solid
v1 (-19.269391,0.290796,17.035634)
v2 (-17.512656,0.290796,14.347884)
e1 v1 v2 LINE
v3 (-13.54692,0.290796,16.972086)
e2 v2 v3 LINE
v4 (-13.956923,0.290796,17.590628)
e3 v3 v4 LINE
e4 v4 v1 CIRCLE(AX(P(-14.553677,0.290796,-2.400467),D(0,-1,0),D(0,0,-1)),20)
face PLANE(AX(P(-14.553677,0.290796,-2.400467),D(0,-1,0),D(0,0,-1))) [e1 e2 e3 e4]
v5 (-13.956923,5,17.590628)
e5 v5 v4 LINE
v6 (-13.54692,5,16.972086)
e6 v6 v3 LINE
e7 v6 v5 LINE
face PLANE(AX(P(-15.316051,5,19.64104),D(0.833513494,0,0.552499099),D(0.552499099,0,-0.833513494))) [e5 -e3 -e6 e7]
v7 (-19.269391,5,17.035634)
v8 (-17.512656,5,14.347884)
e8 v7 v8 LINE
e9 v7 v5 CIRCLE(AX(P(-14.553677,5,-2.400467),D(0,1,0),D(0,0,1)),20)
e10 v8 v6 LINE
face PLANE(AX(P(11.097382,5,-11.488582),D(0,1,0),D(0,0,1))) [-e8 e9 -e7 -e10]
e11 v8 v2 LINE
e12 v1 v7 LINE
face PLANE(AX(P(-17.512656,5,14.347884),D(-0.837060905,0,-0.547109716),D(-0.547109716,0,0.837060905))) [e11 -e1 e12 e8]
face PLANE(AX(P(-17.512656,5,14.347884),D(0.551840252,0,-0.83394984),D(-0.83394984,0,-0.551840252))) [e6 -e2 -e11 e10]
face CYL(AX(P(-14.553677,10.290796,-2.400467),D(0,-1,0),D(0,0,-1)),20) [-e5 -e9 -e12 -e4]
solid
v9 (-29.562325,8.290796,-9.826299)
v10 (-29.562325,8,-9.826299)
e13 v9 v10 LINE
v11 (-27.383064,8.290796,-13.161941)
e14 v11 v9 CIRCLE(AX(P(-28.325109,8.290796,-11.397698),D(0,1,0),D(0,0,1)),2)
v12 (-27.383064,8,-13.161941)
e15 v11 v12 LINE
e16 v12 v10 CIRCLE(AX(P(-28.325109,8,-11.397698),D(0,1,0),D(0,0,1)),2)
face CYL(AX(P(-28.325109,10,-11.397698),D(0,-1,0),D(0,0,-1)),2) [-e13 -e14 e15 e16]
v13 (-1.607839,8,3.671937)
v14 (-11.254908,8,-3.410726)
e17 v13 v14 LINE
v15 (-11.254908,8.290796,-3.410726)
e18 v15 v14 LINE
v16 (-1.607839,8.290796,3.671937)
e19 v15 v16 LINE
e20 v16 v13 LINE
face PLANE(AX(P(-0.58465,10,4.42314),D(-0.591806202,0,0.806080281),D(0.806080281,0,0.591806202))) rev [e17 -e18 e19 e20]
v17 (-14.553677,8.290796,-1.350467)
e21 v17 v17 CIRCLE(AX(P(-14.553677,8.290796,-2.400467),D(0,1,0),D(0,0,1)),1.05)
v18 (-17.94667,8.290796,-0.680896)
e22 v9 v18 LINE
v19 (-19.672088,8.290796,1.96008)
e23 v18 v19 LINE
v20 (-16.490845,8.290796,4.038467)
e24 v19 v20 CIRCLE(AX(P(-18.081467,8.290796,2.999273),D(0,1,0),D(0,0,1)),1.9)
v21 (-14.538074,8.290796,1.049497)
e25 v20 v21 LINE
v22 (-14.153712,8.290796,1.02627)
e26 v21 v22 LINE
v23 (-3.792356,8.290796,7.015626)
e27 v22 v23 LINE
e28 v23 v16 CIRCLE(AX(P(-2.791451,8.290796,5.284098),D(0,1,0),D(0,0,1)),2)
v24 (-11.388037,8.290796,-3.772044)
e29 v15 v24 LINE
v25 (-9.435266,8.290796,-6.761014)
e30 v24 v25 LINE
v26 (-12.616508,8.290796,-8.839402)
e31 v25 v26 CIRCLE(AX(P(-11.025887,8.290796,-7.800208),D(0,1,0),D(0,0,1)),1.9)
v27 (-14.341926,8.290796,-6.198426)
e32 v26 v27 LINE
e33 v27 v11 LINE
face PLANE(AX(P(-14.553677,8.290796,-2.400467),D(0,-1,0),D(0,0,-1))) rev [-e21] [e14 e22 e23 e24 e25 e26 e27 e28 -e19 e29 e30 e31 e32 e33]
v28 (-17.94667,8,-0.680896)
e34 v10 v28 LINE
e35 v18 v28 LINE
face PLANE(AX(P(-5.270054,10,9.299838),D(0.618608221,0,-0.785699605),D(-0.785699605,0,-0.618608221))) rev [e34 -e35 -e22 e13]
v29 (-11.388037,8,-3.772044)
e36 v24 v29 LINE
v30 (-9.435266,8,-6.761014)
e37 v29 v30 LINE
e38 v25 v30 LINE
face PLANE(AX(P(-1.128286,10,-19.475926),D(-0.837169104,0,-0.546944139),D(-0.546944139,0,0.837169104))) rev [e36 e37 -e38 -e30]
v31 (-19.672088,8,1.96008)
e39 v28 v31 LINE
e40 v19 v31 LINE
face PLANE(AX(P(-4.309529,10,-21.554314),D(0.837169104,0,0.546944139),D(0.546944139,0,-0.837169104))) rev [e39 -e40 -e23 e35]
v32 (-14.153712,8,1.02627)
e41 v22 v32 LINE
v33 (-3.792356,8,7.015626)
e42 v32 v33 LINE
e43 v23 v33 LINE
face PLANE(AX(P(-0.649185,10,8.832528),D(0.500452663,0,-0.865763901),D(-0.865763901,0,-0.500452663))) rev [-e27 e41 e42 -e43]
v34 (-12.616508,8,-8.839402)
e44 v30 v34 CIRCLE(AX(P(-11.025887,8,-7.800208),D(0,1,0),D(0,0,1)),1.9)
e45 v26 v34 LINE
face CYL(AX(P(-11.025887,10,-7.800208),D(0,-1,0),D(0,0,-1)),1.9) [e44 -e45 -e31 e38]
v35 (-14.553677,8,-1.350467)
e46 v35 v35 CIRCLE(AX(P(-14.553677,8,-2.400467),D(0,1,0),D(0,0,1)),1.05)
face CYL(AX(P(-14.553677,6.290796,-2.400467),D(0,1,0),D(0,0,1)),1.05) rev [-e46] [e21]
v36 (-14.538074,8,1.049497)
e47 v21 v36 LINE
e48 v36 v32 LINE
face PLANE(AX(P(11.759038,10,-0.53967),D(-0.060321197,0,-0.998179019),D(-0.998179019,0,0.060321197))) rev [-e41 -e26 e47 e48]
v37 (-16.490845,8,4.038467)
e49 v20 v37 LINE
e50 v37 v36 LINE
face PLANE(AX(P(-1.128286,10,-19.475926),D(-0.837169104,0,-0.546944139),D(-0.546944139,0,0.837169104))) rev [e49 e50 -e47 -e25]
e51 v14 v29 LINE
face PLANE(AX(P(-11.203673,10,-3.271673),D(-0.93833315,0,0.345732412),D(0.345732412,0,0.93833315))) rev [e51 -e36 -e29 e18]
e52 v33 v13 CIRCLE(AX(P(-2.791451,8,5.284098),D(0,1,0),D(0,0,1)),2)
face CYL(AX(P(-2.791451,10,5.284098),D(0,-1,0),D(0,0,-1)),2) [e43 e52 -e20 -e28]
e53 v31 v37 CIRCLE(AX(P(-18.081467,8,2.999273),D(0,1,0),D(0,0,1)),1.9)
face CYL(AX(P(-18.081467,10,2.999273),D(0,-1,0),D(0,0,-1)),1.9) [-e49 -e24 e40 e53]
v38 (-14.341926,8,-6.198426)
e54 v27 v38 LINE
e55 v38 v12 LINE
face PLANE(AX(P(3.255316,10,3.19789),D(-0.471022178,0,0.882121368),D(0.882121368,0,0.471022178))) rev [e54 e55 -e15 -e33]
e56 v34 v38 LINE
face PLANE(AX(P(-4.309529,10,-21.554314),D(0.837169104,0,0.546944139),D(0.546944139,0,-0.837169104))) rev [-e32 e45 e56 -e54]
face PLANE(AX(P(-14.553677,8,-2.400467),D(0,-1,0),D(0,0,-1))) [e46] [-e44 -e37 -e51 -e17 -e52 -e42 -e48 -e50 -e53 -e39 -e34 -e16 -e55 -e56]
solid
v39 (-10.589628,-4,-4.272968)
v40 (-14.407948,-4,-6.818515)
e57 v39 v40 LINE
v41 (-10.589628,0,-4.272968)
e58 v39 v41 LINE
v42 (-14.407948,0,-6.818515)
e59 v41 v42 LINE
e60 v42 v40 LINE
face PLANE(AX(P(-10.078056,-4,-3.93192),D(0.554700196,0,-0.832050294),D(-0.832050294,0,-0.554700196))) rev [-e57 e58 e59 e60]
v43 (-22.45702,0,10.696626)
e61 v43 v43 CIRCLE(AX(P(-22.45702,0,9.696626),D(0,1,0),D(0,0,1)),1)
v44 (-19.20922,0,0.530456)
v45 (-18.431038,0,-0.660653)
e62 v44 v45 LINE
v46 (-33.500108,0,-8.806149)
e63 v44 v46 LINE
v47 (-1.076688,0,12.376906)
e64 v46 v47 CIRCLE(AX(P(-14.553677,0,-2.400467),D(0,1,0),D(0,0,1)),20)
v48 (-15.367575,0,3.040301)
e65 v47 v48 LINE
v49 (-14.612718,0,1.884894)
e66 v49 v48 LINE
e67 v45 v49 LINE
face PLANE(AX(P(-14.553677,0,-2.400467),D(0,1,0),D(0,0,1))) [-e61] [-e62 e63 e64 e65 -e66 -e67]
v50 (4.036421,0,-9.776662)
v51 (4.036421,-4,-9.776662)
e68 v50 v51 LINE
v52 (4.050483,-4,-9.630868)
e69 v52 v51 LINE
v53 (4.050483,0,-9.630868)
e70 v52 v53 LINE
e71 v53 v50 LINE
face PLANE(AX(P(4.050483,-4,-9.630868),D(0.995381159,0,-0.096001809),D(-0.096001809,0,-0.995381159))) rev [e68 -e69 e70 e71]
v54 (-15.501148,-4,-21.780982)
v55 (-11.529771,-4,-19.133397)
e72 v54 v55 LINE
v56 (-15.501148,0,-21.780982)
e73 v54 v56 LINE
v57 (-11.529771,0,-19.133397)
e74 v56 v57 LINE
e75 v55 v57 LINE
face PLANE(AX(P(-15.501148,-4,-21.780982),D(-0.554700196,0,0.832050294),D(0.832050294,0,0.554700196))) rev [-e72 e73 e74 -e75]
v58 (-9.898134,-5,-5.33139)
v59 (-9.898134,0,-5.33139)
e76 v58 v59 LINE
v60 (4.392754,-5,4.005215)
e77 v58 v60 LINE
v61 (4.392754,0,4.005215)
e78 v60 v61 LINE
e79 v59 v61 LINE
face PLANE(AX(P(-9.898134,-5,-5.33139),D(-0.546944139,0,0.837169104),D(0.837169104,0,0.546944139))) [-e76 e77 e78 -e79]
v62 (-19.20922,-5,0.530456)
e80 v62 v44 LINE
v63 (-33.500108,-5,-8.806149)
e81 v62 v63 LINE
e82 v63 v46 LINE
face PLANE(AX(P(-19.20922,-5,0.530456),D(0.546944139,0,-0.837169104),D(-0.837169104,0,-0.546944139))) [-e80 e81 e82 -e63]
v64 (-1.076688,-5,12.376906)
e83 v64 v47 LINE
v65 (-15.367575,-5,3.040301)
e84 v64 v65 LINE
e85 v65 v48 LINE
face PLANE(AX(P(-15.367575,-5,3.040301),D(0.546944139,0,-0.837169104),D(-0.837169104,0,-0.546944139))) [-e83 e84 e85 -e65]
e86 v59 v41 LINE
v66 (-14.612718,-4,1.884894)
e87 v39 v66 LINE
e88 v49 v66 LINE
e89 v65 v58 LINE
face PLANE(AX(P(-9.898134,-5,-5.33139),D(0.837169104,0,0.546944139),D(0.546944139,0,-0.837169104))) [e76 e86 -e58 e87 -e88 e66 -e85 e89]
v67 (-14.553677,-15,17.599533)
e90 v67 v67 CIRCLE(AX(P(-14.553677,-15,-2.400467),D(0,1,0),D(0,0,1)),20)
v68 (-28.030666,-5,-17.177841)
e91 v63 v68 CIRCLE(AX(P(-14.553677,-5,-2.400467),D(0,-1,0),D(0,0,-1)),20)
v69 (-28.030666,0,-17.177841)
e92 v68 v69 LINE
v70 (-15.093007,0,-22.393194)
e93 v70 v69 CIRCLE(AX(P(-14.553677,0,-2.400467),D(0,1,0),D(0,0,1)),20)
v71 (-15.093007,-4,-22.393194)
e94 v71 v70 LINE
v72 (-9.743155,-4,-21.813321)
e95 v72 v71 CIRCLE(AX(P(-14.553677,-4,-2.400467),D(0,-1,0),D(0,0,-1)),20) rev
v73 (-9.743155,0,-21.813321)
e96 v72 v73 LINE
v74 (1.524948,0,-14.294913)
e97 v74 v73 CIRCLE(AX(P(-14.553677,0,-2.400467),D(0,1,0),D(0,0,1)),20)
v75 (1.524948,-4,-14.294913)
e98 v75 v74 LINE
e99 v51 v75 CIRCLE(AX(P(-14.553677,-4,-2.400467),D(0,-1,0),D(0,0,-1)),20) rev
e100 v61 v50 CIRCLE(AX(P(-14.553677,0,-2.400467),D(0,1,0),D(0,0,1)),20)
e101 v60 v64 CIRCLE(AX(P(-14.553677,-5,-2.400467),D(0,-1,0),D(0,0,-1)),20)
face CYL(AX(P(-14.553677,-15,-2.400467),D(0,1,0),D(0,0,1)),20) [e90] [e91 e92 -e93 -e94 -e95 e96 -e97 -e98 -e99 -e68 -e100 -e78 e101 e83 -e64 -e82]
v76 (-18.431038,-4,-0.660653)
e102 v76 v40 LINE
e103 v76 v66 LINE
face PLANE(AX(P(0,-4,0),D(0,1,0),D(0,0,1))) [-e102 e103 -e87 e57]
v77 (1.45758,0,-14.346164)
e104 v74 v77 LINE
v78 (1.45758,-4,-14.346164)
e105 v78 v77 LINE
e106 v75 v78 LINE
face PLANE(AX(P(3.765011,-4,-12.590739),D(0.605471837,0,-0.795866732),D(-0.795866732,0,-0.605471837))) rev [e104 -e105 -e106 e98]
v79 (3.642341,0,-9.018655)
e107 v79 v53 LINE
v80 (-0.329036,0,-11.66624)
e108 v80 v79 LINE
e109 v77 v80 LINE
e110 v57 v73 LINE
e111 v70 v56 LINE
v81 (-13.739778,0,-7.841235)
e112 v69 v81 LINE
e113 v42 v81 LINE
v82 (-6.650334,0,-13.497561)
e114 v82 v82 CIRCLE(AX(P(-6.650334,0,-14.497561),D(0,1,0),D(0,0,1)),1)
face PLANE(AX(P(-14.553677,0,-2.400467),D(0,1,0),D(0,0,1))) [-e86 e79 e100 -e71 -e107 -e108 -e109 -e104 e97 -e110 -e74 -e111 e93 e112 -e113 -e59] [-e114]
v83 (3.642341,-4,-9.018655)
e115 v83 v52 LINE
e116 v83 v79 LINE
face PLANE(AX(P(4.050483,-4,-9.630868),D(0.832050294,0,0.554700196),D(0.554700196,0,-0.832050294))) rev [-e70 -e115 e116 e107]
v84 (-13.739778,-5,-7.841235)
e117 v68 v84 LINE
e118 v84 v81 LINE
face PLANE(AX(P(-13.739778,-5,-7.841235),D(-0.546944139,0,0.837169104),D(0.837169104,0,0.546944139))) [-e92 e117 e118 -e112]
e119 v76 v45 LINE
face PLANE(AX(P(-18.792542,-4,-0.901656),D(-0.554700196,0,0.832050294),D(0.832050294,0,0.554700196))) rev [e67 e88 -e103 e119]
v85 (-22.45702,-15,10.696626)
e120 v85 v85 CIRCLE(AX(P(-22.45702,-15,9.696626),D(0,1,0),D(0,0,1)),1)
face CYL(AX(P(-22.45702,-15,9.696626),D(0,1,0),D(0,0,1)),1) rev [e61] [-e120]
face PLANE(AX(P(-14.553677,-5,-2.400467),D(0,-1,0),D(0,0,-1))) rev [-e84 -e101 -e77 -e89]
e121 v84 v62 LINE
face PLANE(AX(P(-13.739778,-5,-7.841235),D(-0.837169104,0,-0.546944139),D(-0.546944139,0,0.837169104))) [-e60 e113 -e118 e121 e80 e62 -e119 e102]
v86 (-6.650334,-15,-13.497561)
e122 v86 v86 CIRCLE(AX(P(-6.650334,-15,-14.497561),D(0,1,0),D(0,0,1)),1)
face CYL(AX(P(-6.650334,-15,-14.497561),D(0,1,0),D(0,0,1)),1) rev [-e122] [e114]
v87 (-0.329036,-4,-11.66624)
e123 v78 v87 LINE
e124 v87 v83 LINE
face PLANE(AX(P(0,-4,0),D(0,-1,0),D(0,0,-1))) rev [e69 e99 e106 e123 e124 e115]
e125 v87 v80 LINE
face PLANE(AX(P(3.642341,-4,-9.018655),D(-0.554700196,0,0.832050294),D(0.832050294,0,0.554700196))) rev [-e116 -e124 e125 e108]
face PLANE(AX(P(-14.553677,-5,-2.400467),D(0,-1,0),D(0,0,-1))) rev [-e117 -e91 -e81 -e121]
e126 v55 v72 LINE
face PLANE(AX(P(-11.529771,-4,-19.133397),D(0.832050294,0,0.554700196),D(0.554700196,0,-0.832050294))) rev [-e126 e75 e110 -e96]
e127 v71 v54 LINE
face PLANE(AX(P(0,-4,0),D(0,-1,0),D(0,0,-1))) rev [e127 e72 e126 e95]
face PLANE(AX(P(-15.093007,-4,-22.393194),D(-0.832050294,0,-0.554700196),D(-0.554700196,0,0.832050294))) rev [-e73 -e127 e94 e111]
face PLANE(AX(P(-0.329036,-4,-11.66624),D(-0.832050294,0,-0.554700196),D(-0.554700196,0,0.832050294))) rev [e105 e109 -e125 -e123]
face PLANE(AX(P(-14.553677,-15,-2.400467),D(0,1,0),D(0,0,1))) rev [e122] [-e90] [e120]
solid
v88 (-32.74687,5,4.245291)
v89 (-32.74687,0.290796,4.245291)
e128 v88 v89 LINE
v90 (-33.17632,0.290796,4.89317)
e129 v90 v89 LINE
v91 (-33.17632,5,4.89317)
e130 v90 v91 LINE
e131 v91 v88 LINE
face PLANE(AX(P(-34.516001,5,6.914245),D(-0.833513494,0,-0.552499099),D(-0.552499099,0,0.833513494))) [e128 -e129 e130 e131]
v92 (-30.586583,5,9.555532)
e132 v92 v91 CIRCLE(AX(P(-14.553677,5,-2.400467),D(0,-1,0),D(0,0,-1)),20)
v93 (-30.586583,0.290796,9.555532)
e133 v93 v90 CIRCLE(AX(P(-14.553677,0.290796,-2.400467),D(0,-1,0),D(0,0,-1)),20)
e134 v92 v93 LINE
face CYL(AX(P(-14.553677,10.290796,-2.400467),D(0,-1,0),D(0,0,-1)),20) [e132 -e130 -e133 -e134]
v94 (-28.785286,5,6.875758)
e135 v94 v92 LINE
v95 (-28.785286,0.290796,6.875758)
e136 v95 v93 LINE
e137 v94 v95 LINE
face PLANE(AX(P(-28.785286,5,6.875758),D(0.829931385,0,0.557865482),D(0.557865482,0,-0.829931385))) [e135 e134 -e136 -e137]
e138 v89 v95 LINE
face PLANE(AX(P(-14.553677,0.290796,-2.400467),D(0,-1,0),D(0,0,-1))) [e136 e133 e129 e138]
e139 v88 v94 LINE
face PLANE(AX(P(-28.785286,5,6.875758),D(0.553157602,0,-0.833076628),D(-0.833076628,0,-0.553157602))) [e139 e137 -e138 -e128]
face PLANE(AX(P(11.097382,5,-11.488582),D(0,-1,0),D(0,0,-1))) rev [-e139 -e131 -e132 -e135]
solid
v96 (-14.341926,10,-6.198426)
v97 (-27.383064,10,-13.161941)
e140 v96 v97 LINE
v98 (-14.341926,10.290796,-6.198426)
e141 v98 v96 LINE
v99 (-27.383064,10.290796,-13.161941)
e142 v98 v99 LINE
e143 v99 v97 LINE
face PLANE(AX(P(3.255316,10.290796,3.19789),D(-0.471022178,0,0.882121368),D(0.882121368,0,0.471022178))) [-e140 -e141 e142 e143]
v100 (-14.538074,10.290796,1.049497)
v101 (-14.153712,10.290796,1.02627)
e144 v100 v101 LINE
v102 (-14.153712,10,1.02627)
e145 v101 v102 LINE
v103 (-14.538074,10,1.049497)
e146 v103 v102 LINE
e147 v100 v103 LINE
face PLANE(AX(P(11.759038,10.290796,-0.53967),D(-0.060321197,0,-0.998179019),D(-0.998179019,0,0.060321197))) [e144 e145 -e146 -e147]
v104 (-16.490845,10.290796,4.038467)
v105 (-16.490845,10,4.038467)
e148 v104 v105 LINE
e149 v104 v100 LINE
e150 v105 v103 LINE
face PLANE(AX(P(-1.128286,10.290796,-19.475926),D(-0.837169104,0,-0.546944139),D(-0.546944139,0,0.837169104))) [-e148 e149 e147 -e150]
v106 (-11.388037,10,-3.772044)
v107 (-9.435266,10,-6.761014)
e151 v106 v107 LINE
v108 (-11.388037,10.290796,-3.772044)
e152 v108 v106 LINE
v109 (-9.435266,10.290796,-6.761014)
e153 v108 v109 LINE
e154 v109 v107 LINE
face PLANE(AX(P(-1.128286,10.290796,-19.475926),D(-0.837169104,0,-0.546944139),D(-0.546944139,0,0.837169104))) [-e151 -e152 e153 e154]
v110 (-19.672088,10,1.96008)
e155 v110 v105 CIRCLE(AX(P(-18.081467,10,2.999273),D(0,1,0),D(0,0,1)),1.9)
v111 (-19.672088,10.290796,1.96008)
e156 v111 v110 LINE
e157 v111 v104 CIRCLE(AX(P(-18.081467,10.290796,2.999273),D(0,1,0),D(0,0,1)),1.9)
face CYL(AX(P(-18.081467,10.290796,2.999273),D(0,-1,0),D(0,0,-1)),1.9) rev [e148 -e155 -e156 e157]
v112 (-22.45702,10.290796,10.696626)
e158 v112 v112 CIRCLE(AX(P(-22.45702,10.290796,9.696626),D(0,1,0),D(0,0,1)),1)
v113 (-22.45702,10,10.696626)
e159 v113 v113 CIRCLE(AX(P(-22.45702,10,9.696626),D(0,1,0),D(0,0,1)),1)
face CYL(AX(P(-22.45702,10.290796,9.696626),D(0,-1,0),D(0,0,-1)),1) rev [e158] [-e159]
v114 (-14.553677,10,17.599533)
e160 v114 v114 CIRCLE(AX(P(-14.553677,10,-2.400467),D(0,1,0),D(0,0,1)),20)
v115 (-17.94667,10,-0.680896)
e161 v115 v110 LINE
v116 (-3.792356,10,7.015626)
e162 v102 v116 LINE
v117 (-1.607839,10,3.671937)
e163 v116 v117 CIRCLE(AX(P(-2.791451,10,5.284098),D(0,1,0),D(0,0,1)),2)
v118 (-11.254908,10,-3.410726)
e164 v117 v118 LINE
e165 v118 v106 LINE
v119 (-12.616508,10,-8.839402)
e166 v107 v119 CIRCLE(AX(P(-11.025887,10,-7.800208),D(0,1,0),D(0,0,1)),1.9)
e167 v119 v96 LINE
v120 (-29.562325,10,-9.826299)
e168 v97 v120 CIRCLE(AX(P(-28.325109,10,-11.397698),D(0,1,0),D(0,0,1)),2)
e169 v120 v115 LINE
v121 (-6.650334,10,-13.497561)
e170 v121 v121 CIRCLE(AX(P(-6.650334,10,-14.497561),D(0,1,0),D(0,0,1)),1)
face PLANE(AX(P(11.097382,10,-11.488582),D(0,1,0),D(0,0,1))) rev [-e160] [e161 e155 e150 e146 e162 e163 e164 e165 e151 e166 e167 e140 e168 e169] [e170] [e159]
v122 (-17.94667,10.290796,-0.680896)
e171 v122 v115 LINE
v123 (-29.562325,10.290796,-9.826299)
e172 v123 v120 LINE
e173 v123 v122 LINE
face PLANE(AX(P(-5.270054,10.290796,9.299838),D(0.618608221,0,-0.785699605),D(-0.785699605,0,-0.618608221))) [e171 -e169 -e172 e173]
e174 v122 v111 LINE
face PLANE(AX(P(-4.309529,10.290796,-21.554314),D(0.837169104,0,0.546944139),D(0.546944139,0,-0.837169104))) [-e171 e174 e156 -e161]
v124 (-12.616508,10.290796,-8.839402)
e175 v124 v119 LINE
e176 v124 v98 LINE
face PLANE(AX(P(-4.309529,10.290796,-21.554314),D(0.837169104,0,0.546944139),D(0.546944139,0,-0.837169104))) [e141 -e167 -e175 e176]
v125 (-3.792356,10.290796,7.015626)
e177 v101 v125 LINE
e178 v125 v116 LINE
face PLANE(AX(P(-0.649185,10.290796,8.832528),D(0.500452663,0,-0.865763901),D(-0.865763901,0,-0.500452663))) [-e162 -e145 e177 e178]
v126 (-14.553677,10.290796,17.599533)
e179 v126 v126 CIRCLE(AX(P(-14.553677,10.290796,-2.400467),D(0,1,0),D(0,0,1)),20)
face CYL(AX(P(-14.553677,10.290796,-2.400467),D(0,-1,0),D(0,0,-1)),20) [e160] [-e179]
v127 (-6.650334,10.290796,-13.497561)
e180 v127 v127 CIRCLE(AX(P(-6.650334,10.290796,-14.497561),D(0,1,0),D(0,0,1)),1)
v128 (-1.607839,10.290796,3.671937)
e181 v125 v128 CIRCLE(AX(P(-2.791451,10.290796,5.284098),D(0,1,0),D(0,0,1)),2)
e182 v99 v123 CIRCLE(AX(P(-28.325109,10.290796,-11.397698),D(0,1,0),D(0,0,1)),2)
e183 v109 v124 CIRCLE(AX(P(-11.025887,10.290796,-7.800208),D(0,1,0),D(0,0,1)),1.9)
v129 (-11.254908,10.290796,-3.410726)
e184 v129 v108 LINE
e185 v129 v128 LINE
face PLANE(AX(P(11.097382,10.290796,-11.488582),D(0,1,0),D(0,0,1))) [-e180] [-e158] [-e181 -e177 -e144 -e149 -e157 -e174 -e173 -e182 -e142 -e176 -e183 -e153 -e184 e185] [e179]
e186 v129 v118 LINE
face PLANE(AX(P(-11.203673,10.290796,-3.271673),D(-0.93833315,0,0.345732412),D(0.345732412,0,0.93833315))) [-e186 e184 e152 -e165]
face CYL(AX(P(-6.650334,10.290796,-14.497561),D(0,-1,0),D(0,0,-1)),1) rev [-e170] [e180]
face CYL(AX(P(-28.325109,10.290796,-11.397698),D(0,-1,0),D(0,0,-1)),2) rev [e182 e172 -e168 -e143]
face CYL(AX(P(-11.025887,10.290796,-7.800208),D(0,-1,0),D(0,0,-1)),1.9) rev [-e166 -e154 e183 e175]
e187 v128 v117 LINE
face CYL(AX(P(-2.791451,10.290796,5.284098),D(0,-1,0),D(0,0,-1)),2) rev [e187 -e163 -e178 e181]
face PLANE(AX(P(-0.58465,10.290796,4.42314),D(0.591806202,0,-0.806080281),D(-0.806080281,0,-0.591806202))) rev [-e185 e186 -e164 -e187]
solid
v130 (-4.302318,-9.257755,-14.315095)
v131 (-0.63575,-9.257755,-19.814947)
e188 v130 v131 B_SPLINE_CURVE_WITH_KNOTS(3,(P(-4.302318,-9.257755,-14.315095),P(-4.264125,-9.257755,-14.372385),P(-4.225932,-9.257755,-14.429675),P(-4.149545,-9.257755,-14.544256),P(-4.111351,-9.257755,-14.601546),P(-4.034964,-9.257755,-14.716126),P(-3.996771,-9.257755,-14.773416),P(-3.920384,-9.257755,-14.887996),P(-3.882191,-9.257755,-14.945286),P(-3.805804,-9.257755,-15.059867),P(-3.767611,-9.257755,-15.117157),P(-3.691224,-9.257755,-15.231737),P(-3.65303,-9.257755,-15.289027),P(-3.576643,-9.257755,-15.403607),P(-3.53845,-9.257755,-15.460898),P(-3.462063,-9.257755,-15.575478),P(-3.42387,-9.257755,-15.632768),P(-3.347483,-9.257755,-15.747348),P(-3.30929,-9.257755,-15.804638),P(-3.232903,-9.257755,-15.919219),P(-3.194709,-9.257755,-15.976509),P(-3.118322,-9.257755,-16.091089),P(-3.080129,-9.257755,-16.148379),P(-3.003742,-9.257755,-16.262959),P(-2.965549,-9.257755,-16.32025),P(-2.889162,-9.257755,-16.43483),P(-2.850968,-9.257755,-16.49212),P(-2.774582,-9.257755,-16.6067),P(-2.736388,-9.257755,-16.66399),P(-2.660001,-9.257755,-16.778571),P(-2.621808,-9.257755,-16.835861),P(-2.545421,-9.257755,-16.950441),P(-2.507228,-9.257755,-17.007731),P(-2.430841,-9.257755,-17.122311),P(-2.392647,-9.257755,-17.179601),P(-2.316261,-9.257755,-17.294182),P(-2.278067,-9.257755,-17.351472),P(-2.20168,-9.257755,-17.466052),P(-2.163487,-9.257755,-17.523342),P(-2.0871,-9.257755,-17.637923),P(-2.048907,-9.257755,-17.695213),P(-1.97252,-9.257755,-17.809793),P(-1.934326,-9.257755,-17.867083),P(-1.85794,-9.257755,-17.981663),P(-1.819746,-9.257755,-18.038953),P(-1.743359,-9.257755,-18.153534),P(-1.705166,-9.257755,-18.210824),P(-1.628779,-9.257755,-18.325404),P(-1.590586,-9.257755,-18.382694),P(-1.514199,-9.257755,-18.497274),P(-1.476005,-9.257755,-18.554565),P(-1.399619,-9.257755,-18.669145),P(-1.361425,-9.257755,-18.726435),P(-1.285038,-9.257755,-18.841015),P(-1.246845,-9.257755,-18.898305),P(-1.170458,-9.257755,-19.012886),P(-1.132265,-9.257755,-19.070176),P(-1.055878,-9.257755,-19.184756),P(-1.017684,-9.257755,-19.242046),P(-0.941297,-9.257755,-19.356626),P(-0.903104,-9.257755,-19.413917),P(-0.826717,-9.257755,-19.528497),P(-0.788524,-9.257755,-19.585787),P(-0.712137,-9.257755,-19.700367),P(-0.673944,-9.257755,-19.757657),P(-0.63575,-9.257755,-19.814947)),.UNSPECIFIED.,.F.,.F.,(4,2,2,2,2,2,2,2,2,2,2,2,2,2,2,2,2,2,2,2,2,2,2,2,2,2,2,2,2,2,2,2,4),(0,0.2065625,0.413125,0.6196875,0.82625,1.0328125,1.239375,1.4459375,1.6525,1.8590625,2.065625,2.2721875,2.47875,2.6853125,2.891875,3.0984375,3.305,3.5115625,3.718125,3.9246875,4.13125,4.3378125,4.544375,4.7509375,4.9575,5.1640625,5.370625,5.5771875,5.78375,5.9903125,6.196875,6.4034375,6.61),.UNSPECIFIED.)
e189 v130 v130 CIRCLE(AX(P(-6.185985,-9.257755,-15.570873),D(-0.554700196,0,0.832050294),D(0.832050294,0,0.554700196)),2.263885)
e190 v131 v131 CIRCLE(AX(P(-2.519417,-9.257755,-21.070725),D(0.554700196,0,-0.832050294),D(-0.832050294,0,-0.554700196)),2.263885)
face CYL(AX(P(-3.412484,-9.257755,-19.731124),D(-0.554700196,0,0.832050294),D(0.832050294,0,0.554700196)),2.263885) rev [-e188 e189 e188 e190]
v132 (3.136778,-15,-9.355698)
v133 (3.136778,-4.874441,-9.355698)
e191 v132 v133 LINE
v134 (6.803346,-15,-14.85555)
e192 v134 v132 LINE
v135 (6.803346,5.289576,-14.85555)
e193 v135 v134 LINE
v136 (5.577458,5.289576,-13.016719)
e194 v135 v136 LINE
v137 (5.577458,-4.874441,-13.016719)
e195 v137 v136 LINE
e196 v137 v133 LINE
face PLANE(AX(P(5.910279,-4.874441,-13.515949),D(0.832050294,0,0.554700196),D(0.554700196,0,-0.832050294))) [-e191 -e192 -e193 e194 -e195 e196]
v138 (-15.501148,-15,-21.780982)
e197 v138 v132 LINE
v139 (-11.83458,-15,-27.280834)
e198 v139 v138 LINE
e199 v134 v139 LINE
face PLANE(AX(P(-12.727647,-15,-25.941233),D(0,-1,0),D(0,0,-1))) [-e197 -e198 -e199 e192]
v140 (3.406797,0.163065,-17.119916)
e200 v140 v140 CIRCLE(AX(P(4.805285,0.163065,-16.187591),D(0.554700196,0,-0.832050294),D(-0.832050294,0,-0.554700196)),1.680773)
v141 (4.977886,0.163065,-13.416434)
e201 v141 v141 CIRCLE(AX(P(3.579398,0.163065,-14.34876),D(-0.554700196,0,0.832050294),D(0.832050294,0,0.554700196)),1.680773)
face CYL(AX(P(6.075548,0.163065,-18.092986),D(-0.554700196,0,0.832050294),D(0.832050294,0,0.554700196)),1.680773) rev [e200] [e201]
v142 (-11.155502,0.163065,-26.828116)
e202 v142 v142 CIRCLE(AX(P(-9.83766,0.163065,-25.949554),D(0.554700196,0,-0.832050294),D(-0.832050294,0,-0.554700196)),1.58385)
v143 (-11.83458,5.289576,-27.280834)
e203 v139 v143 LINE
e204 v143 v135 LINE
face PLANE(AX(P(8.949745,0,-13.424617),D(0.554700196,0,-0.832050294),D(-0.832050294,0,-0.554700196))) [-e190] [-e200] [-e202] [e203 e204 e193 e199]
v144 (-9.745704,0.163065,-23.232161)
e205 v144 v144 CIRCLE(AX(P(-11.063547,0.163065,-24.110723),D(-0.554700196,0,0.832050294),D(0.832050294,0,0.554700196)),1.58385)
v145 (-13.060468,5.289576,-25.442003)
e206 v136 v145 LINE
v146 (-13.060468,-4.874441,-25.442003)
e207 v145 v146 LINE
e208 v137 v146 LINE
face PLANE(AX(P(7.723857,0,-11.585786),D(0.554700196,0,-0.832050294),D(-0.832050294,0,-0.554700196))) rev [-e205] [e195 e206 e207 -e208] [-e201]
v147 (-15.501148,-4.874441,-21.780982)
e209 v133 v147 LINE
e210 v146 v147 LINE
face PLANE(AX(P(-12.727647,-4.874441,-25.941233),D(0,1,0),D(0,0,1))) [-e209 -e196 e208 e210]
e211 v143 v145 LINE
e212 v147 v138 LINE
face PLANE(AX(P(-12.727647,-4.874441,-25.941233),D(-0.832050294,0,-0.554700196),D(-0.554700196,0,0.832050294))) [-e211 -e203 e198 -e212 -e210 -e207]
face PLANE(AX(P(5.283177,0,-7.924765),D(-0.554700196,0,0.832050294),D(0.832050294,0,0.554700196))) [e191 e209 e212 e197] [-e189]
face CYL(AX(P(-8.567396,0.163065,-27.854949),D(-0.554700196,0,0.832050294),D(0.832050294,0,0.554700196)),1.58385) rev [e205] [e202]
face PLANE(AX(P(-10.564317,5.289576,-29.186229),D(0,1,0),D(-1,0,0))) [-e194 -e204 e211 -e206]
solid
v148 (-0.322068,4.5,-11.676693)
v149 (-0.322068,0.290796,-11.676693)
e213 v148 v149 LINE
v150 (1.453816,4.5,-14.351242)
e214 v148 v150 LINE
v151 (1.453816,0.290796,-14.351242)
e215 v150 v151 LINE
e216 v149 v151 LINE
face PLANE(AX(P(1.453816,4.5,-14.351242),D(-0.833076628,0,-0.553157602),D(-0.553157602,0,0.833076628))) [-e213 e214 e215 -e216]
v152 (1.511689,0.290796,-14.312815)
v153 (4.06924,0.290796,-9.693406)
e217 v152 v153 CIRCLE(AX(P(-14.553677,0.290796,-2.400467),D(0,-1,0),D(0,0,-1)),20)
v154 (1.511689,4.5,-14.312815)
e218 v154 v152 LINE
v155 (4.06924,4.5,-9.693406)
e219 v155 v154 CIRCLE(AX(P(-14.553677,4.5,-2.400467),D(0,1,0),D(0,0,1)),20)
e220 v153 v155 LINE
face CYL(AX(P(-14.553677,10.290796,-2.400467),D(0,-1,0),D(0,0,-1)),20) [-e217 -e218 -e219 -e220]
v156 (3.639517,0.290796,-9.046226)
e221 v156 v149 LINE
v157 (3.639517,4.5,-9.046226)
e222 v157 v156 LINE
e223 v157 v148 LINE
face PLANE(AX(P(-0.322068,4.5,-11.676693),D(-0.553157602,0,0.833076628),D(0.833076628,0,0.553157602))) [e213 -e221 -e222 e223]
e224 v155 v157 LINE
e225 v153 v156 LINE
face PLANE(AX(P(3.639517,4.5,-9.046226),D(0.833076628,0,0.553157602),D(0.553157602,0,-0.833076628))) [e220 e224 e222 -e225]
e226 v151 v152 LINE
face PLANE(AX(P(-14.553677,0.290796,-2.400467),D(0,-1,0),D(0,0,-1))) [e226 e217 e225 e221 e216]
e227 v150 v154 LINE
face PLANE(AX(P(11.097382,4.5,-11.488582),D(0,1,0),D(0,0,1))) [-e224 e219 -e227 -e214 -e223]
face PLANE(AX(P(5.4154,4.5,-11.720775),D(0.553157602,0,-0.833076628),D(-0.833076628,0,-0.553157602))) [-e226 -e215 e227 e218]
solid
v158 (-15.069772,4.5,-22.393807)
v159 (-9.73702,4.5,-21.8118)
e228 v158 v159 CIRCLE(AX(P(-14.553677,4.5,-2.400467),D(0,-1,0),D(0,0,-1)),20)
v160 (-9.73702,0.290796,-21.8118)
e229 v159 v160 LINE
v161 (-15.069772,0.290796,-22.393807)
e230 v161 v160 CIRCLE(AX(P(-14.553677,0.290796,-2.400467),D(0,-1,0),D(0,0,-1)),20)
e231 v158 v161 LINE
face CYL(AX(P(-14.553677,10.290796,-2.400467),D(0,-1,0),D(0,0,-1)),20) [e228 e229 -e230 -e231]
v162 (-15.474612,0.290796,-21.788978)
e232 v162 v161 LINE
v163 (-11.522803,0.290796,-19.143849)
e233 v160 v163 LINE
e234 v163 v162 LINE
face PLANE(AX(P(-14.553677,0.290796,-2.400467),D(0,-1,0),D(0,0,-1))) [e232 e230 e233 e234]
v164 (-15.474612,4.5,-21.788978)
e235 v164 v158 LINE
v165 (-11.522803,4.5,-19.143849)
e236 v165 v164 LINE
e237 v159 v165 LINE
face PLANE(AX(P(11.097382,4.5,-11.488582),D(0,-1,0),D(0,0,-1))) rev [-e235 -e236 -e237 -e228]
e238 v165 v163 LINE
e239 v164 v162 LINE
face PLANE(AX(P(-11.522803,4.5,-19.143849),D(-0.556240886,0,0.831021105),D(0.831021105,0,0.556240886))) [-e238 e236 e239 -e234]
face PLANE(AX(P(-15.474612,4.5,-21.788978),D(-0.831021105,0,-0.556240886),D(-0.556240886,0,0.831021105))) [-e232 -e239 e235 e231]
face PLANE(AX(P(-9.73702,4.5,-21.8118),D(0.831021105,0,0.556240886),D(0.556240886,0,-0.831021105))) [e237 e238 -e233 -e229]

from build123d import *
from build123d.topology import SkipClean

# Parameters (mm, degrees)
SERVO_CONNECTOR_1_START         = 0.290796426
SERVO_CONNECTOR_1_OUTLINE_R     = 20
SERVO_CONNECTOR_1_OUTLINE_R_2   = 1
SERVO_CONNECTOR_1_DEPTH         = 10
SERVO_CONNECTOR_1_START_2       = -4.709203574
SERVO_CONNECTOR_1_2_DEPTH       = 13
SERVO_CONNECTOR_1_3_DEPTH       = 8
SERVO_CONNECTOR_1_START_3       = 6.290796426
SERVO_CONNECTOR_1_4_OUTLINE_R   = 2.3
SERVO_CONNECTOR_1_4_OUTLINE_R_2 = 1.05
SERVO_CONNECTOR_1_4_DEPTH       = 2
SKETCH5_R                       = 20
SKETCH5_R_2                     = 1
BOSS_EXTRUDE1_DEPTH             = 15
CAVITY1_OUTLINE_R               = 1
CAVITY1_DEPTH                   = 10
CAVITY1_START                   = -5
CAVITY1_2_DEPTH                 = 13
CAVITY1_START_2                 = 0.290796426
CAVITY1_3_OUTLINE_R             = 1.05
CAVITY1_3_DEPTH                 = 7.709203574
CAVITY1_START_3                 = 5
CAVITY1_4_DEPTH                 = 5
CAVITY1_START_4                 = 4.5
CAVITY1_5_DEPTH                 = 0.5
CUT_EXTRUDE1_DEPTH              = 4
SKETCH10_W                      = 22.399999201
SKETCH10_H                      = 20.28957609
SKETCH10_R                      = 2.263885391
SKETCH10_R_2                    = 1.680773428
SKETCH10_R_3                    = 1.58384996
BOSS_EXTRUDE2_DEPTH             = 4.5
SKETCH18_W                      = 22.399999201
SKETCH18_H                      = 10.125559165
SKETCH18_R                      = 2.263885391
BOSS_EXTRUDE26_DEPTH            = 5
CUT_EXTRUDE2_DEPTH              = 4
SKETCH22_W                      = 22.399999201
SKETCH22_H                      = 20.28957609
SKETCH22_R                      = 1.680773428
SKETCH22_R_2                    = 1.58384996
SKETCH22_R_3                    = 2.263885391
CUT_EXTRUDE3_DEPTH              = 2.29


# Read off the part's stored shape, not the designer's step: Servo_Connector_1, Cavity1
with BuildPart() as part:
    # Servo_Connector_1 outline → Servo_Connector_1 (new body)
    with BuildSketch(Plane(origin=(0, 0, 0), x_dir=(1, 0, 0), z_dir=(0, 1, 0)).offset(SERVO_CONNECTOR_1_START)):
        with Locations((-14.553676836, 2.400467292)):
            Circle(SERVO_CONNECTOR_1_OUTLINE_R)
        with BuildLine():
            Line((-11.254907871, 3.410726325), (-1.607838516, -3.671937294))
            ThreePointArc((-1.607838516, -3.671937294), (-1.117112712, -6.377986132), (-3.792356246, -7.015625657))
            Line((-3.792356246, -7.015625657), (-14.153711806, -1.026269928))
            Line((-14.153711806, -1.026269928), (-14.538074231, -1.049497426))
            Line((-14.538074231, -1.049497426), (-16.490845232, -4.038467294))
            ThreePointArc((-16.490845232, -4.038467294), (-19.120660394, -4.589894729), (-19.672087828, -1.960079567))
            Line((-19.672087828, -1.960079567), (-17.946670336, 0.680896201))
            Line((-17.946670336, 0.680896201), (-29.562325044, 9.826299163))
            ThreePointArc((-29.562325044, 9.826299163), (-29.999446811, 12.49158665), (-27.383064246, 13.161941108))
            Line((-27.383064246, 13.161941108), (-14.341925933, 6.198426111))
            Line((-14.341925933, 6.198426111), (-12.61650844, 8.839401879))
            ThreePointArc((-12.61650844, 8.839401879), (-9.986693279, 9.390829313), (-9.435265844, 6.761014152))
            Line((-9.435265844, 6.761014152), (-11.388036845, 3.772044284))
            Line((-11.388036845, 3.772044284), (-11.254907871, 3.410726325))
        make_face(mode=Mode.SUBTRACT)
        with Locations((-6.650334033, 14.49756085)):
            Circle(SERVO_CONNECTOR_1_OUTLINE_R_2, mode=Mode.SUBTRACT)
        with Locations((-22.457019639, -9.696626265)):
            Circle(SERVO_CONNECTOR_1_OUTLINE_R_2, mode=Mode.SUBTRACT)
    extrude(amount=SERVO_CONNECTOR_1_DEPTH)

    # Servo_Connector_1 2 outline → Servo_Connector_1 2 (add)
    with SkipClean():  # the faces are left unmerged after this step: merging them gives an invalid solid
        with BuildSketch(Plane(origin=(0, 0, 0), x_dir=(1, 0, 0), z_dir=(0, 1, 0)).offset(SERVO_CONNECTOR_1_START_2)):
            with BuildLine():
                Line((-13.744445083, 7.844284333), (-28.030666138, 17.177840515))
                ThreePointArc((-28.030666138, 17.177840515), (-31.297058922, 13.339350064), (-33.500107524, 8.806149471))
                Line((-33.500107524, 8.806149471), (-19.213886469, -0.527406711))
                Line((-19.213886469, -0.527406711), (-13.744445083, 7.844284333))
            make_face()
            with BuildLine():
                Line((-15.362908589, -3.043349748), (-1.076687534, -12.37690593))
                ThreePointArc((-1.076687534, -12.37690593), (2.189705251, -8.53841548), (4.392753852, -4.005214887))
                Line((4.392753852, -4.005214887), (-9.893467203, 5.328341295))
                Line((-9.893467203, 5.328341295), (-15.362908589, -3.043349748))
            make_face()
        extrude(amount=SERVO_CONNECTOR_1_2_DEPTH)

    # Servo_Connector_1 3 outline → Servo_Connector_1 3 (add)
    with SkipClean():  # the faces are left unmerged after this step: merging them gives an invalid solid
        with BuildSketch(Plane(origin=(0, 0, 0), x_dir=(1, 0, 0), z_dir=(0, 1, 0)).offset(SERVO_CONNECTOR_1_START)):
            with BuildLine():
                ThreePointArc((-16.479165734, 3.658438876), (-13.29571537, 4.3259628), (-12.628174718, 1.142515943))
                Line((-12.628174718, 1.142515943), (-11.181503427, 3.356834416))
                Line((-11.181503427, 3.356834416), (-11.254907871, 3.410726325))
                Line((-11.254907871, 3.410726325), (-11.388036845, 3.772044284))
                Line((-11.388036845, 3.772044284), (-9.435265844, 6.761014152))
                ThreePointArc((-9.435265844, 6.761014152), (-9.986693279, 9.390829313), (-12.61650844, 8.839401879))
                Line((-12.61650844, 8.839401879), (-14.341925933, 6.198426111))
                Line((-14.341925933, 6.198426111), (-14.696153283, 6.387571215))
                Line((-14.696153283, 6.387571215), (-16.479165734, 3.658438876))
            make_face()
            with BuildLine():
                ThreePointArc((-12.628174718, 1.142515943), (-15.811638302, 0.474971784), (-16.479165734, 3.658438876))
                Line((-16.479165734, 3.658438876), (-18.262178269, 0.929306407))
                Line((-18.262178269, 0.929306407), (-17.946670336, 0.680896201))
                Line((-17.946670336, 0.680896201), (-19.672087828, -1.960079567))
                ThreePointArc((-19.672087828, -1.960079567), (-19.120660394, -4.589894729), (-16.490845232, -4.038467294))
                Line((-16.490845232, -4.038467294), (-14.538074231, -1.049497426))
                Line((-14.538074231, -1.049497426), (-14.153711806, -1.026269928))
                Line((-14.153711806, -1.026269928), (-14.074872366, -1.07184287))
                Line((-14.074872366, -1.07184287), (-12.628174718, 1.142515943))
            make_face()
        extrude(amount=SERVO_CONNECTOR_1_3_DEPTH)

    # Servo_Connector_1 4 outline → Servo_Connector_1 4 (add)
    with SkipClean():  # the faces are left unmerged after this step: merging them gives an invalid solid
        with BuildSketch(Plane(origin=(0, 0, 0), x_dir=(1, 0, 0), z_dir=(0, 1, 0)).offset(SERVO_CONNECTOR_1_START_3)):
            with Locations((-14.553676836, 2.400467292)):
                Circle(SERVO_CONNECTOR_1_4_OUTLINE_R)
            with Locations((-14.553676836, 2.400467292)):
                Circle(SERVO_CONNECTOR_1_4_OUTLINE_R_2, mode=Mode.SUBTRACT)
        extrude(amount=SERVO_CONNECTOR_1_4_DEPTH)

    # Cavity1 outline → Cavity1 (cut)
    with BuildSketch(Plane(origin=(0, 0, 0), x_dir=(1, 0, 0), z_dir=(0, 1, 0))):
        with BuildLine():
            ThreePointArc((-15.069772054, 22.393807326), (-31.218538546, 13.458603853), (-33.176320371, -4.893170193))
            Line((-33.176320371, -4.893170193), (-32.746870213, -4.245291305))
            Line((-32.746870213, -4.245291305), (-28.785286033, -6.875758097))
            Line((-28.785286033, -6.875758097), (-30.586583313, -9.555531616))
            ThreePointArc((-30.586583313, -9.555531616), (-25.581564287, -14.284427025), (-19.269391365, -17.035634078))
            Line((-19.269391365, -17.035634078), (-17.512656353, -14.347883968))
            Line((-17.512656353, -14.347883968), (-13.546919726, -16.972086279))
            Line((-13.546919726, -16.972086279), (-13.956923486, -17.590627862))
            ThreePointArc((-13.956923486, -17.590627862), (2.133251073, -8.624342773), (4.069240241, 9.693406312))
            Line((4.069240241, 9.693406312), (3.639516541, 9.046225889))
            Line((3.639516541, 9.046225889), (-0.32206764, 11.676692681))
            Line((-0.32206764, 11.676692681), (1.453816138, 14.351241968))
            Line((1.453816138, 14.351241968), (1.511688907, 14.312814817))
            ThreePointArc((1.511688907, 14.312814817), (-3.459831348, 19.041578802), (-9.737020182, 21.811799515))
            Line((-9.737020182, 21.811799515), (-11.522802686, 19.143849379))
            Line((-11.522802686, 19.143849379), (-15.474612102, 21.788978318))
            Line((-15.474612102, 21.788978318), (-15.069772054, 22.393807326))
        make_face()
        with BuildLine():
            Line((-14.341925933, 6.198426111), (-12.61650844, 8.839401879))
            ThreePointArc((-12.61650844, 8.839401879), (-9.986693279, 9.390829313), (-9.435265844, 6.761014152))
            Line((-9.435265844, 6.761014152), (-11.388036845, 3.772044284))
            Line((-11.388036845, 3.772044284), (-11.254907871, 3.410726325))
            Line((-11.254907871, 3.410726325), (-1.607838516, -3.671937294))
            ThreePointArc((-1.607838516, -3.671937294), (-1.117112712, -6.377986132), (-3.792356246, -7.015625657))
            Line((-3.792356246, -7.015625657), (-14.153711806, -1.026269928))
            Line((-14.153711806, -1.026269928), (-14.538074231, -1.049497426))
            Line((-14.538074231, -1.049497426), (-16.490845232, -4.038467294))
            ThreePointArc((-16.490845232, -4.038467294), (-19.120660394, -4.589894729), (-19.672087828, -1.960079567))
            Line((-19.672087828, -1.960079567), (-17.946670336, 0.680896201))
            Line((-17.946670336, 0.680896201), (-29.562325044, 9.826299163))
            ThreePointArc((-29.562325044, 9.826299163), (-29.999446811, 12.49158665), (-27.383064246, 13.161941108))
            Line((-27.383064246, 13.161941108), (-14.341925933, 6.198426111))
        make_face(mode=Mode.SUBTRACT)
        with Locations((-6.650334033, 14.49756085)):
            Circle(CAVITY1_OUTLINE_R, mode=Mode.SUBTRACT)
        with Locations((-22.457019639, -9.696626265)):
            Circle(CAVITY1_OUTLINE_R, mode=Mode.SUBTRACT)
    extrude(amount=CAVITY1_DEPTH, mode=Mode.SUBTRACT)


with BuildPart() as body_2:
    # Sketch5 → Boss-Extrude1 (new body)
    with BuildSketch(Plane(origin=(0, 0, 0), x_dir=(1, 0, 0), z_dir=(0, 1, 0))):
        with Locations(Location((-14.553676836, 2.400467292, 0), (0, 0, 270))):
            Circle(SKETCH5_R)
        with Locations(Location((-6.650334033, 14.49756085, 0), (0, 0, 270))):
            Circle(SKETCH5_R_2, mode=Mode.SUBTRACT)
        with Locations(Location((-22.457019639, -9.696626265, 0), (0, 0, 270))):
            Circle(SKETCH5_R_2, mode=Mode.SUBTRACT)
    extrude(amount=-BOSS_EXTRUDE1_DEPTH)


with BuildPart() as cavity1_2_tool:
    # Cavity1 2 outline → Cavity1 2 (new body)
    with BuildSketch(Plane(origin=(0, 0, 0), x_dir=(1, 0, 0), z_dir=(0, 1, 0)).offset(CAVITY1_START)):
        with BuildLine():
            Line((-13.739778259, 7.841235377), (-28.030666138, 17.177840515))
            ThreePointArc((-28.030666138, 17.177840515), (-31.297058922, 13.339350064), (-33.500107524, 8.806149471))
            Line((-33.500107524, 8.806149471), (-19.209219645, -0.530455667))
            Line((-19.209219645, -0.530455667), (-13.739778259, 7.841235377))
        make_face()
        with BuildLine():
            Line((-15.367575413, -3.040300792), (-1.076687534, -12.37690593))
            ThreePointArc((-1.076687534, -12.37690593), (2.189705251, -8.53841548), (4.392753852, -4.005214887))
            Line((4.392753852, -4.005214887), (-9.898134027, 5.331390251))
            Line((-9.898134027, 5.331390251), (-15.367575413, -3.040300792))
        make_face()
    extrude(amount=CAVITY1_2_DEPTH)


with BuildPart() as part_1:
    add(part.part)

    # Cavity1 2: cut by cavity1_2_tool
    add(cavity1_2_tool.part, mode=Mode.SUBTRACT)

    # Cavity1 3 outline → Cavity1 3 (cut)
    with BuildSketch(Plane(origin=(0, 0, 0), x_dir=(1, 0, 0), z_dir=(0, 1, 0)).offset(CAVITY1_START_2)):
        with BuildLine():
            Line((-12.61650844, 8.839401879), (-14.341925933, 6.198426111))
            Line((-14.341925933, 6.198426111), (-14.691216656, 6.384935228))
            Line((-14.691216656, 6.384935228), (-18.257781248, 0.925844482))
            Line((-18.257781248, 0.925844482), (-17.946670336, 0.680896201))
            Line((-17.946670336, 0.680896201), (-19.672087828, -1.960079567))
            ThreePointArc((-19.672087828, -1.960079567), (-19.120660394, -4.589894729), (-16.490845232, -4.038467294))
            Line((-16.490845232, -4.038467294), (-14.538074231, -1.049497426))
            Line((-14.538074231, -1.049497426), (-14.153711806, -1.026269928))
            Line((-14.153711806, -1.026269928), (-14.079705792, -1.06904892))
            Line((-14.079705792, -1.06904892), (-11.186003648, 3.360138378))
            Line((-11.186003648, 3.360138378), (-11.254907871, 3.410726325))
            Line((-11.254907871, 3.410726325), (-11.388036845, 3.772044284))
            Line((-11.388036845, 3.772044284), (-9.435265844, 6.761014152))
            ThreePointArc((-9.435265844, 6.761014152), (-9.986693279, 9.390829313), (-12.61650844, 8.839401879))
        make_face()
        with Locations((-14.553676836, 2.400467292)):
            Circle(CAVITY1_3_OUTLINE_R, mode=Mode.SUBTRACT)
    extrude(amount=CAVITY1_3_DEPTH, mode=Mode.SUBTRACT)

    # Cavity1 4 outline → Cavity1 4 (cut)
    with BuildSketch(Plane(origin=(0, 0, 0), x_dir=(1, 0, 0), z_dir=(0, 1, 0)).offset(CAVITY1_START_3)):
        with BuildLine():
            ThreePointArc((-9.737020182, 21.811799515), (-12.38379425, 22.282409088), (-15.069772054, 22.393807326))
            Line((-15.069772054, 22.393807326), (-15.474612102, 21.788978318))
            Line((-15.474612102, 21.788978318), (-11.522802686, 19.143849379))
            Line((-11.522802686, 19.143849379), (-9.737020182, 21.811799515))
        make_face()
        with BuildLine():
            Line((-32.746870213, -4.245291305), (-33.176320371, -4.893170193))
            ThreePointArc((-33.176320371, -4.893170193), (-32.037560563, -7.311062445), (-30.586583313, -9.555531616))
            Line((-30.586583313, -9.555531616), (-28.785286033, -6.875758097))
            Line((-28.785286033, -6.875758097), (-32.746870213, -4.245291305))
        make_face()
        with BuildLine():
            ThreePointArc((4.069240241, 9.693406312), (2.943579377, 12.087883099), (1.511688907, 14.312814817))
            Line((1.511688907, 14.312814817), (1.453816138, 14.351241968))
            Line((1.453816138, 14.351241968), (-0.32206764, 11.676692681))
            Line((-0.32206764, 11.676692681), (3.639516541, 9.046225889))
            Line((3.639516541, 9.046225889), (4.069240241, 9.693406312))
        make_face()
        with BuildLine():
            Line((-17.512656353, -14.347883968), (-19.269391365, -17.035634078))
            ThreePointArc((-19.269391365, -17.035634078), (-16.631768466, -17.491278111), (-13.956923486, -17.590627862))
            Line((-13.956923486, -17.590627862), (-13.546919726, -16.972086279))
            Line((-13.546919726, -16.972086279), (-17.512656353, -14.347883968))
        make_face()
    extrude(amount=CAVITY1_4_DEPTH, mode=Mode.SUBTRACT)

    # Cavity1 5 outline → Cavity1 5 (cut)
    with BuildSketch(Plane(origin=(0, 0, 0), x_dir=(1, 0, 0), z_dir=(0, 1, 0)).offset(CAVITY1_START_4)):
        with BuildLine():
            ThreePointArc((-9.737020182, 21.811799515), (-12.38379425, 22.282409088), (-15.069772054, 22.393807326))
            Line((-15.069772054, 22.393807326), (-15.474612102, 21.788978318))
            Line((-15.474612102, 21.788978318), (-11.522802686, 19.143849379))
            Line((-11.522802686, 19.143849379), (-9.737020182, 21.811799515))
        make_face()
        with BuildLine():
            ThreePointArc((4.069240241, 9.693406312), (2.943579377, 12.087883099), (1.511688907, 14.312814817))
            Line((1.511688907, 14.312814817), (1.453816138, 14.351241968))
            Line((1.453816138, 14.351241968), (-0.32206764, 11.676692681))
            Line((-0.32206764, 11.676692681), (3.639516541, 9.046225889))
            Line((3.639516541, 9.046225889), (4.069240241, 9.693406312))
        make_face()
    extrude(amount=CAVITY1_5_DEPTH, mode=Mode.SUBTRACT)


with BuildPart() as body_2_1:
    add(body_2.part)

    # Cavity1 2: cut by cavity1_2_tool
    add(cavity1_2_tool.part, mode=Mode.SUBTRACT)

    # Sketch8 → Cut-Extrude1 (cut)
    with BuildSketch(Plane(origin=(0, 0, 0), x_dir=(1, 0, 0), z_dir=(0, 1, 0))):
        Polygon((-18.792542403, 0.90165554), (-14.158020196, -2.188025931), (-10.078056202, 3.93192006), (-14.712578409, 7.021601531), align=None)
    extrude(amount=-CUT_EXTRUDE1_DEPTH, mode=Mode.SUBTRACT)

    # Sketch21 → Cut-Extrude2 (cut)
    with BuildSketch(Plane(origin=(0, 0, 0), x_dir=(1, 0, 0), z_dir=(0, 1, 0))):
        Polygon((-15.093006766, 22.39319405), (-15.501148384, 21.780981623), (-11.529771096, 19.133396765), (-9.743155086, 21.813320779), (-12.251021416, 23.268093801), align=None)
        Polygon((4.050482857, 9.630867635), (3.765011338, 12.590738631), (1.45757996, 14.346164081), (-0.32903605, 11.666240067), (3.642341239, 9.018655208), align=None)
    extrude(amount=-CUT_EXTRUDE2_DEPTH, mode=Mode.SUBTRACT)


with BuildPart() as body_3:
    # Sketch10 → Boss-Extrude2 (new body)
    with BuildSketch(Plane(origin=(7.723857494, 0, -11.585786242), x_dir=(0.8320502943378437, 0, 0.5547001962252291), z_dir=(-0.5547001962252291, 0, 0.8320502943378437))):
        with Locations((-13.779650256, -4.855211955)):
            Rectangle(SKETCH10_W, SKETCH10_H)
        with Locations((-13.784216706, -9.257754986)):
            Circle(SKETCH10_R, mode=Mode.SUBTRACT)
        with Locations((-4.981020949, 0.163064574)):
            Circle(SKETCH10_R_2, mode=Mode.SUBTRACT)
        with Locations((-22.579650208, 0.163064574)):
            Circle(SKETCH10_R_3, mode=Mode.SUBTRACT)
    extrude(amount=-BOSS_EXTRUDE2_DEPTH)


with BuildPart() as body_4:
    # Sketch18 → Boss-Extrude26 (new body)
    with BuildSketch(Plane(origin=(5.283176631, 0, -7.924764947), x_dir=(0.8320502943378437, 0, 0.554700196225229), z_dir=(-0.554700196225229, 0, 0.8320502943378437))):
        with Locations((-13.779650256, -9.937220418)):
            Rectangle(SKETCH18_W, SKETCH18_H)
        with Locations((-13.784216706, -9.257754986)):
            Circle(SKETCH18_R, mode=Mode.SUBTRACT)
    extrude(amount=-BOSS_EXTRUDE26_DEPTH)

    # Combine4: union body 3
    add(body_3.part)

    # Sketch22 → Cut-Extrude3 (cut)
    with BuildSketch(Plane(origin=(10.220008377, 0, -15.330012566), x_dir=(-0.8320502943378437, 0, -0.554700196225229), z_dir=(0.554700196225229, 0, -0.8320502943378437))):
        with Locations((13.779650256, -4.855211955)):
            Rectangle(SKETCH22_W, SKETCH22_H)
        with Locations(Location((4.981020949, 0.163064574, 0), (0, 0, 180))):
            Circle(SKETCH22_R, mode=Mode.SUBTRACT)
        with Locations(Location((22.579650208, 0.163064574, 0), (0, 0, 180))):
            Circle(SKETCH22_R_2, mode=Mode.SUBTRACT)
        with Locations(Location((13.784216706, -9.257754986, 0), (0, 0, 180))):
            Circle(SKETCH22_R_3, mode=Mode.SUBTRACT)
    extrude(amount=-CUT_EXTRUDE3_DEPTH, mode=Mode.SUBTRACT)


solid = Compound([part_1.part, body_2_1.part, body_4.part])
